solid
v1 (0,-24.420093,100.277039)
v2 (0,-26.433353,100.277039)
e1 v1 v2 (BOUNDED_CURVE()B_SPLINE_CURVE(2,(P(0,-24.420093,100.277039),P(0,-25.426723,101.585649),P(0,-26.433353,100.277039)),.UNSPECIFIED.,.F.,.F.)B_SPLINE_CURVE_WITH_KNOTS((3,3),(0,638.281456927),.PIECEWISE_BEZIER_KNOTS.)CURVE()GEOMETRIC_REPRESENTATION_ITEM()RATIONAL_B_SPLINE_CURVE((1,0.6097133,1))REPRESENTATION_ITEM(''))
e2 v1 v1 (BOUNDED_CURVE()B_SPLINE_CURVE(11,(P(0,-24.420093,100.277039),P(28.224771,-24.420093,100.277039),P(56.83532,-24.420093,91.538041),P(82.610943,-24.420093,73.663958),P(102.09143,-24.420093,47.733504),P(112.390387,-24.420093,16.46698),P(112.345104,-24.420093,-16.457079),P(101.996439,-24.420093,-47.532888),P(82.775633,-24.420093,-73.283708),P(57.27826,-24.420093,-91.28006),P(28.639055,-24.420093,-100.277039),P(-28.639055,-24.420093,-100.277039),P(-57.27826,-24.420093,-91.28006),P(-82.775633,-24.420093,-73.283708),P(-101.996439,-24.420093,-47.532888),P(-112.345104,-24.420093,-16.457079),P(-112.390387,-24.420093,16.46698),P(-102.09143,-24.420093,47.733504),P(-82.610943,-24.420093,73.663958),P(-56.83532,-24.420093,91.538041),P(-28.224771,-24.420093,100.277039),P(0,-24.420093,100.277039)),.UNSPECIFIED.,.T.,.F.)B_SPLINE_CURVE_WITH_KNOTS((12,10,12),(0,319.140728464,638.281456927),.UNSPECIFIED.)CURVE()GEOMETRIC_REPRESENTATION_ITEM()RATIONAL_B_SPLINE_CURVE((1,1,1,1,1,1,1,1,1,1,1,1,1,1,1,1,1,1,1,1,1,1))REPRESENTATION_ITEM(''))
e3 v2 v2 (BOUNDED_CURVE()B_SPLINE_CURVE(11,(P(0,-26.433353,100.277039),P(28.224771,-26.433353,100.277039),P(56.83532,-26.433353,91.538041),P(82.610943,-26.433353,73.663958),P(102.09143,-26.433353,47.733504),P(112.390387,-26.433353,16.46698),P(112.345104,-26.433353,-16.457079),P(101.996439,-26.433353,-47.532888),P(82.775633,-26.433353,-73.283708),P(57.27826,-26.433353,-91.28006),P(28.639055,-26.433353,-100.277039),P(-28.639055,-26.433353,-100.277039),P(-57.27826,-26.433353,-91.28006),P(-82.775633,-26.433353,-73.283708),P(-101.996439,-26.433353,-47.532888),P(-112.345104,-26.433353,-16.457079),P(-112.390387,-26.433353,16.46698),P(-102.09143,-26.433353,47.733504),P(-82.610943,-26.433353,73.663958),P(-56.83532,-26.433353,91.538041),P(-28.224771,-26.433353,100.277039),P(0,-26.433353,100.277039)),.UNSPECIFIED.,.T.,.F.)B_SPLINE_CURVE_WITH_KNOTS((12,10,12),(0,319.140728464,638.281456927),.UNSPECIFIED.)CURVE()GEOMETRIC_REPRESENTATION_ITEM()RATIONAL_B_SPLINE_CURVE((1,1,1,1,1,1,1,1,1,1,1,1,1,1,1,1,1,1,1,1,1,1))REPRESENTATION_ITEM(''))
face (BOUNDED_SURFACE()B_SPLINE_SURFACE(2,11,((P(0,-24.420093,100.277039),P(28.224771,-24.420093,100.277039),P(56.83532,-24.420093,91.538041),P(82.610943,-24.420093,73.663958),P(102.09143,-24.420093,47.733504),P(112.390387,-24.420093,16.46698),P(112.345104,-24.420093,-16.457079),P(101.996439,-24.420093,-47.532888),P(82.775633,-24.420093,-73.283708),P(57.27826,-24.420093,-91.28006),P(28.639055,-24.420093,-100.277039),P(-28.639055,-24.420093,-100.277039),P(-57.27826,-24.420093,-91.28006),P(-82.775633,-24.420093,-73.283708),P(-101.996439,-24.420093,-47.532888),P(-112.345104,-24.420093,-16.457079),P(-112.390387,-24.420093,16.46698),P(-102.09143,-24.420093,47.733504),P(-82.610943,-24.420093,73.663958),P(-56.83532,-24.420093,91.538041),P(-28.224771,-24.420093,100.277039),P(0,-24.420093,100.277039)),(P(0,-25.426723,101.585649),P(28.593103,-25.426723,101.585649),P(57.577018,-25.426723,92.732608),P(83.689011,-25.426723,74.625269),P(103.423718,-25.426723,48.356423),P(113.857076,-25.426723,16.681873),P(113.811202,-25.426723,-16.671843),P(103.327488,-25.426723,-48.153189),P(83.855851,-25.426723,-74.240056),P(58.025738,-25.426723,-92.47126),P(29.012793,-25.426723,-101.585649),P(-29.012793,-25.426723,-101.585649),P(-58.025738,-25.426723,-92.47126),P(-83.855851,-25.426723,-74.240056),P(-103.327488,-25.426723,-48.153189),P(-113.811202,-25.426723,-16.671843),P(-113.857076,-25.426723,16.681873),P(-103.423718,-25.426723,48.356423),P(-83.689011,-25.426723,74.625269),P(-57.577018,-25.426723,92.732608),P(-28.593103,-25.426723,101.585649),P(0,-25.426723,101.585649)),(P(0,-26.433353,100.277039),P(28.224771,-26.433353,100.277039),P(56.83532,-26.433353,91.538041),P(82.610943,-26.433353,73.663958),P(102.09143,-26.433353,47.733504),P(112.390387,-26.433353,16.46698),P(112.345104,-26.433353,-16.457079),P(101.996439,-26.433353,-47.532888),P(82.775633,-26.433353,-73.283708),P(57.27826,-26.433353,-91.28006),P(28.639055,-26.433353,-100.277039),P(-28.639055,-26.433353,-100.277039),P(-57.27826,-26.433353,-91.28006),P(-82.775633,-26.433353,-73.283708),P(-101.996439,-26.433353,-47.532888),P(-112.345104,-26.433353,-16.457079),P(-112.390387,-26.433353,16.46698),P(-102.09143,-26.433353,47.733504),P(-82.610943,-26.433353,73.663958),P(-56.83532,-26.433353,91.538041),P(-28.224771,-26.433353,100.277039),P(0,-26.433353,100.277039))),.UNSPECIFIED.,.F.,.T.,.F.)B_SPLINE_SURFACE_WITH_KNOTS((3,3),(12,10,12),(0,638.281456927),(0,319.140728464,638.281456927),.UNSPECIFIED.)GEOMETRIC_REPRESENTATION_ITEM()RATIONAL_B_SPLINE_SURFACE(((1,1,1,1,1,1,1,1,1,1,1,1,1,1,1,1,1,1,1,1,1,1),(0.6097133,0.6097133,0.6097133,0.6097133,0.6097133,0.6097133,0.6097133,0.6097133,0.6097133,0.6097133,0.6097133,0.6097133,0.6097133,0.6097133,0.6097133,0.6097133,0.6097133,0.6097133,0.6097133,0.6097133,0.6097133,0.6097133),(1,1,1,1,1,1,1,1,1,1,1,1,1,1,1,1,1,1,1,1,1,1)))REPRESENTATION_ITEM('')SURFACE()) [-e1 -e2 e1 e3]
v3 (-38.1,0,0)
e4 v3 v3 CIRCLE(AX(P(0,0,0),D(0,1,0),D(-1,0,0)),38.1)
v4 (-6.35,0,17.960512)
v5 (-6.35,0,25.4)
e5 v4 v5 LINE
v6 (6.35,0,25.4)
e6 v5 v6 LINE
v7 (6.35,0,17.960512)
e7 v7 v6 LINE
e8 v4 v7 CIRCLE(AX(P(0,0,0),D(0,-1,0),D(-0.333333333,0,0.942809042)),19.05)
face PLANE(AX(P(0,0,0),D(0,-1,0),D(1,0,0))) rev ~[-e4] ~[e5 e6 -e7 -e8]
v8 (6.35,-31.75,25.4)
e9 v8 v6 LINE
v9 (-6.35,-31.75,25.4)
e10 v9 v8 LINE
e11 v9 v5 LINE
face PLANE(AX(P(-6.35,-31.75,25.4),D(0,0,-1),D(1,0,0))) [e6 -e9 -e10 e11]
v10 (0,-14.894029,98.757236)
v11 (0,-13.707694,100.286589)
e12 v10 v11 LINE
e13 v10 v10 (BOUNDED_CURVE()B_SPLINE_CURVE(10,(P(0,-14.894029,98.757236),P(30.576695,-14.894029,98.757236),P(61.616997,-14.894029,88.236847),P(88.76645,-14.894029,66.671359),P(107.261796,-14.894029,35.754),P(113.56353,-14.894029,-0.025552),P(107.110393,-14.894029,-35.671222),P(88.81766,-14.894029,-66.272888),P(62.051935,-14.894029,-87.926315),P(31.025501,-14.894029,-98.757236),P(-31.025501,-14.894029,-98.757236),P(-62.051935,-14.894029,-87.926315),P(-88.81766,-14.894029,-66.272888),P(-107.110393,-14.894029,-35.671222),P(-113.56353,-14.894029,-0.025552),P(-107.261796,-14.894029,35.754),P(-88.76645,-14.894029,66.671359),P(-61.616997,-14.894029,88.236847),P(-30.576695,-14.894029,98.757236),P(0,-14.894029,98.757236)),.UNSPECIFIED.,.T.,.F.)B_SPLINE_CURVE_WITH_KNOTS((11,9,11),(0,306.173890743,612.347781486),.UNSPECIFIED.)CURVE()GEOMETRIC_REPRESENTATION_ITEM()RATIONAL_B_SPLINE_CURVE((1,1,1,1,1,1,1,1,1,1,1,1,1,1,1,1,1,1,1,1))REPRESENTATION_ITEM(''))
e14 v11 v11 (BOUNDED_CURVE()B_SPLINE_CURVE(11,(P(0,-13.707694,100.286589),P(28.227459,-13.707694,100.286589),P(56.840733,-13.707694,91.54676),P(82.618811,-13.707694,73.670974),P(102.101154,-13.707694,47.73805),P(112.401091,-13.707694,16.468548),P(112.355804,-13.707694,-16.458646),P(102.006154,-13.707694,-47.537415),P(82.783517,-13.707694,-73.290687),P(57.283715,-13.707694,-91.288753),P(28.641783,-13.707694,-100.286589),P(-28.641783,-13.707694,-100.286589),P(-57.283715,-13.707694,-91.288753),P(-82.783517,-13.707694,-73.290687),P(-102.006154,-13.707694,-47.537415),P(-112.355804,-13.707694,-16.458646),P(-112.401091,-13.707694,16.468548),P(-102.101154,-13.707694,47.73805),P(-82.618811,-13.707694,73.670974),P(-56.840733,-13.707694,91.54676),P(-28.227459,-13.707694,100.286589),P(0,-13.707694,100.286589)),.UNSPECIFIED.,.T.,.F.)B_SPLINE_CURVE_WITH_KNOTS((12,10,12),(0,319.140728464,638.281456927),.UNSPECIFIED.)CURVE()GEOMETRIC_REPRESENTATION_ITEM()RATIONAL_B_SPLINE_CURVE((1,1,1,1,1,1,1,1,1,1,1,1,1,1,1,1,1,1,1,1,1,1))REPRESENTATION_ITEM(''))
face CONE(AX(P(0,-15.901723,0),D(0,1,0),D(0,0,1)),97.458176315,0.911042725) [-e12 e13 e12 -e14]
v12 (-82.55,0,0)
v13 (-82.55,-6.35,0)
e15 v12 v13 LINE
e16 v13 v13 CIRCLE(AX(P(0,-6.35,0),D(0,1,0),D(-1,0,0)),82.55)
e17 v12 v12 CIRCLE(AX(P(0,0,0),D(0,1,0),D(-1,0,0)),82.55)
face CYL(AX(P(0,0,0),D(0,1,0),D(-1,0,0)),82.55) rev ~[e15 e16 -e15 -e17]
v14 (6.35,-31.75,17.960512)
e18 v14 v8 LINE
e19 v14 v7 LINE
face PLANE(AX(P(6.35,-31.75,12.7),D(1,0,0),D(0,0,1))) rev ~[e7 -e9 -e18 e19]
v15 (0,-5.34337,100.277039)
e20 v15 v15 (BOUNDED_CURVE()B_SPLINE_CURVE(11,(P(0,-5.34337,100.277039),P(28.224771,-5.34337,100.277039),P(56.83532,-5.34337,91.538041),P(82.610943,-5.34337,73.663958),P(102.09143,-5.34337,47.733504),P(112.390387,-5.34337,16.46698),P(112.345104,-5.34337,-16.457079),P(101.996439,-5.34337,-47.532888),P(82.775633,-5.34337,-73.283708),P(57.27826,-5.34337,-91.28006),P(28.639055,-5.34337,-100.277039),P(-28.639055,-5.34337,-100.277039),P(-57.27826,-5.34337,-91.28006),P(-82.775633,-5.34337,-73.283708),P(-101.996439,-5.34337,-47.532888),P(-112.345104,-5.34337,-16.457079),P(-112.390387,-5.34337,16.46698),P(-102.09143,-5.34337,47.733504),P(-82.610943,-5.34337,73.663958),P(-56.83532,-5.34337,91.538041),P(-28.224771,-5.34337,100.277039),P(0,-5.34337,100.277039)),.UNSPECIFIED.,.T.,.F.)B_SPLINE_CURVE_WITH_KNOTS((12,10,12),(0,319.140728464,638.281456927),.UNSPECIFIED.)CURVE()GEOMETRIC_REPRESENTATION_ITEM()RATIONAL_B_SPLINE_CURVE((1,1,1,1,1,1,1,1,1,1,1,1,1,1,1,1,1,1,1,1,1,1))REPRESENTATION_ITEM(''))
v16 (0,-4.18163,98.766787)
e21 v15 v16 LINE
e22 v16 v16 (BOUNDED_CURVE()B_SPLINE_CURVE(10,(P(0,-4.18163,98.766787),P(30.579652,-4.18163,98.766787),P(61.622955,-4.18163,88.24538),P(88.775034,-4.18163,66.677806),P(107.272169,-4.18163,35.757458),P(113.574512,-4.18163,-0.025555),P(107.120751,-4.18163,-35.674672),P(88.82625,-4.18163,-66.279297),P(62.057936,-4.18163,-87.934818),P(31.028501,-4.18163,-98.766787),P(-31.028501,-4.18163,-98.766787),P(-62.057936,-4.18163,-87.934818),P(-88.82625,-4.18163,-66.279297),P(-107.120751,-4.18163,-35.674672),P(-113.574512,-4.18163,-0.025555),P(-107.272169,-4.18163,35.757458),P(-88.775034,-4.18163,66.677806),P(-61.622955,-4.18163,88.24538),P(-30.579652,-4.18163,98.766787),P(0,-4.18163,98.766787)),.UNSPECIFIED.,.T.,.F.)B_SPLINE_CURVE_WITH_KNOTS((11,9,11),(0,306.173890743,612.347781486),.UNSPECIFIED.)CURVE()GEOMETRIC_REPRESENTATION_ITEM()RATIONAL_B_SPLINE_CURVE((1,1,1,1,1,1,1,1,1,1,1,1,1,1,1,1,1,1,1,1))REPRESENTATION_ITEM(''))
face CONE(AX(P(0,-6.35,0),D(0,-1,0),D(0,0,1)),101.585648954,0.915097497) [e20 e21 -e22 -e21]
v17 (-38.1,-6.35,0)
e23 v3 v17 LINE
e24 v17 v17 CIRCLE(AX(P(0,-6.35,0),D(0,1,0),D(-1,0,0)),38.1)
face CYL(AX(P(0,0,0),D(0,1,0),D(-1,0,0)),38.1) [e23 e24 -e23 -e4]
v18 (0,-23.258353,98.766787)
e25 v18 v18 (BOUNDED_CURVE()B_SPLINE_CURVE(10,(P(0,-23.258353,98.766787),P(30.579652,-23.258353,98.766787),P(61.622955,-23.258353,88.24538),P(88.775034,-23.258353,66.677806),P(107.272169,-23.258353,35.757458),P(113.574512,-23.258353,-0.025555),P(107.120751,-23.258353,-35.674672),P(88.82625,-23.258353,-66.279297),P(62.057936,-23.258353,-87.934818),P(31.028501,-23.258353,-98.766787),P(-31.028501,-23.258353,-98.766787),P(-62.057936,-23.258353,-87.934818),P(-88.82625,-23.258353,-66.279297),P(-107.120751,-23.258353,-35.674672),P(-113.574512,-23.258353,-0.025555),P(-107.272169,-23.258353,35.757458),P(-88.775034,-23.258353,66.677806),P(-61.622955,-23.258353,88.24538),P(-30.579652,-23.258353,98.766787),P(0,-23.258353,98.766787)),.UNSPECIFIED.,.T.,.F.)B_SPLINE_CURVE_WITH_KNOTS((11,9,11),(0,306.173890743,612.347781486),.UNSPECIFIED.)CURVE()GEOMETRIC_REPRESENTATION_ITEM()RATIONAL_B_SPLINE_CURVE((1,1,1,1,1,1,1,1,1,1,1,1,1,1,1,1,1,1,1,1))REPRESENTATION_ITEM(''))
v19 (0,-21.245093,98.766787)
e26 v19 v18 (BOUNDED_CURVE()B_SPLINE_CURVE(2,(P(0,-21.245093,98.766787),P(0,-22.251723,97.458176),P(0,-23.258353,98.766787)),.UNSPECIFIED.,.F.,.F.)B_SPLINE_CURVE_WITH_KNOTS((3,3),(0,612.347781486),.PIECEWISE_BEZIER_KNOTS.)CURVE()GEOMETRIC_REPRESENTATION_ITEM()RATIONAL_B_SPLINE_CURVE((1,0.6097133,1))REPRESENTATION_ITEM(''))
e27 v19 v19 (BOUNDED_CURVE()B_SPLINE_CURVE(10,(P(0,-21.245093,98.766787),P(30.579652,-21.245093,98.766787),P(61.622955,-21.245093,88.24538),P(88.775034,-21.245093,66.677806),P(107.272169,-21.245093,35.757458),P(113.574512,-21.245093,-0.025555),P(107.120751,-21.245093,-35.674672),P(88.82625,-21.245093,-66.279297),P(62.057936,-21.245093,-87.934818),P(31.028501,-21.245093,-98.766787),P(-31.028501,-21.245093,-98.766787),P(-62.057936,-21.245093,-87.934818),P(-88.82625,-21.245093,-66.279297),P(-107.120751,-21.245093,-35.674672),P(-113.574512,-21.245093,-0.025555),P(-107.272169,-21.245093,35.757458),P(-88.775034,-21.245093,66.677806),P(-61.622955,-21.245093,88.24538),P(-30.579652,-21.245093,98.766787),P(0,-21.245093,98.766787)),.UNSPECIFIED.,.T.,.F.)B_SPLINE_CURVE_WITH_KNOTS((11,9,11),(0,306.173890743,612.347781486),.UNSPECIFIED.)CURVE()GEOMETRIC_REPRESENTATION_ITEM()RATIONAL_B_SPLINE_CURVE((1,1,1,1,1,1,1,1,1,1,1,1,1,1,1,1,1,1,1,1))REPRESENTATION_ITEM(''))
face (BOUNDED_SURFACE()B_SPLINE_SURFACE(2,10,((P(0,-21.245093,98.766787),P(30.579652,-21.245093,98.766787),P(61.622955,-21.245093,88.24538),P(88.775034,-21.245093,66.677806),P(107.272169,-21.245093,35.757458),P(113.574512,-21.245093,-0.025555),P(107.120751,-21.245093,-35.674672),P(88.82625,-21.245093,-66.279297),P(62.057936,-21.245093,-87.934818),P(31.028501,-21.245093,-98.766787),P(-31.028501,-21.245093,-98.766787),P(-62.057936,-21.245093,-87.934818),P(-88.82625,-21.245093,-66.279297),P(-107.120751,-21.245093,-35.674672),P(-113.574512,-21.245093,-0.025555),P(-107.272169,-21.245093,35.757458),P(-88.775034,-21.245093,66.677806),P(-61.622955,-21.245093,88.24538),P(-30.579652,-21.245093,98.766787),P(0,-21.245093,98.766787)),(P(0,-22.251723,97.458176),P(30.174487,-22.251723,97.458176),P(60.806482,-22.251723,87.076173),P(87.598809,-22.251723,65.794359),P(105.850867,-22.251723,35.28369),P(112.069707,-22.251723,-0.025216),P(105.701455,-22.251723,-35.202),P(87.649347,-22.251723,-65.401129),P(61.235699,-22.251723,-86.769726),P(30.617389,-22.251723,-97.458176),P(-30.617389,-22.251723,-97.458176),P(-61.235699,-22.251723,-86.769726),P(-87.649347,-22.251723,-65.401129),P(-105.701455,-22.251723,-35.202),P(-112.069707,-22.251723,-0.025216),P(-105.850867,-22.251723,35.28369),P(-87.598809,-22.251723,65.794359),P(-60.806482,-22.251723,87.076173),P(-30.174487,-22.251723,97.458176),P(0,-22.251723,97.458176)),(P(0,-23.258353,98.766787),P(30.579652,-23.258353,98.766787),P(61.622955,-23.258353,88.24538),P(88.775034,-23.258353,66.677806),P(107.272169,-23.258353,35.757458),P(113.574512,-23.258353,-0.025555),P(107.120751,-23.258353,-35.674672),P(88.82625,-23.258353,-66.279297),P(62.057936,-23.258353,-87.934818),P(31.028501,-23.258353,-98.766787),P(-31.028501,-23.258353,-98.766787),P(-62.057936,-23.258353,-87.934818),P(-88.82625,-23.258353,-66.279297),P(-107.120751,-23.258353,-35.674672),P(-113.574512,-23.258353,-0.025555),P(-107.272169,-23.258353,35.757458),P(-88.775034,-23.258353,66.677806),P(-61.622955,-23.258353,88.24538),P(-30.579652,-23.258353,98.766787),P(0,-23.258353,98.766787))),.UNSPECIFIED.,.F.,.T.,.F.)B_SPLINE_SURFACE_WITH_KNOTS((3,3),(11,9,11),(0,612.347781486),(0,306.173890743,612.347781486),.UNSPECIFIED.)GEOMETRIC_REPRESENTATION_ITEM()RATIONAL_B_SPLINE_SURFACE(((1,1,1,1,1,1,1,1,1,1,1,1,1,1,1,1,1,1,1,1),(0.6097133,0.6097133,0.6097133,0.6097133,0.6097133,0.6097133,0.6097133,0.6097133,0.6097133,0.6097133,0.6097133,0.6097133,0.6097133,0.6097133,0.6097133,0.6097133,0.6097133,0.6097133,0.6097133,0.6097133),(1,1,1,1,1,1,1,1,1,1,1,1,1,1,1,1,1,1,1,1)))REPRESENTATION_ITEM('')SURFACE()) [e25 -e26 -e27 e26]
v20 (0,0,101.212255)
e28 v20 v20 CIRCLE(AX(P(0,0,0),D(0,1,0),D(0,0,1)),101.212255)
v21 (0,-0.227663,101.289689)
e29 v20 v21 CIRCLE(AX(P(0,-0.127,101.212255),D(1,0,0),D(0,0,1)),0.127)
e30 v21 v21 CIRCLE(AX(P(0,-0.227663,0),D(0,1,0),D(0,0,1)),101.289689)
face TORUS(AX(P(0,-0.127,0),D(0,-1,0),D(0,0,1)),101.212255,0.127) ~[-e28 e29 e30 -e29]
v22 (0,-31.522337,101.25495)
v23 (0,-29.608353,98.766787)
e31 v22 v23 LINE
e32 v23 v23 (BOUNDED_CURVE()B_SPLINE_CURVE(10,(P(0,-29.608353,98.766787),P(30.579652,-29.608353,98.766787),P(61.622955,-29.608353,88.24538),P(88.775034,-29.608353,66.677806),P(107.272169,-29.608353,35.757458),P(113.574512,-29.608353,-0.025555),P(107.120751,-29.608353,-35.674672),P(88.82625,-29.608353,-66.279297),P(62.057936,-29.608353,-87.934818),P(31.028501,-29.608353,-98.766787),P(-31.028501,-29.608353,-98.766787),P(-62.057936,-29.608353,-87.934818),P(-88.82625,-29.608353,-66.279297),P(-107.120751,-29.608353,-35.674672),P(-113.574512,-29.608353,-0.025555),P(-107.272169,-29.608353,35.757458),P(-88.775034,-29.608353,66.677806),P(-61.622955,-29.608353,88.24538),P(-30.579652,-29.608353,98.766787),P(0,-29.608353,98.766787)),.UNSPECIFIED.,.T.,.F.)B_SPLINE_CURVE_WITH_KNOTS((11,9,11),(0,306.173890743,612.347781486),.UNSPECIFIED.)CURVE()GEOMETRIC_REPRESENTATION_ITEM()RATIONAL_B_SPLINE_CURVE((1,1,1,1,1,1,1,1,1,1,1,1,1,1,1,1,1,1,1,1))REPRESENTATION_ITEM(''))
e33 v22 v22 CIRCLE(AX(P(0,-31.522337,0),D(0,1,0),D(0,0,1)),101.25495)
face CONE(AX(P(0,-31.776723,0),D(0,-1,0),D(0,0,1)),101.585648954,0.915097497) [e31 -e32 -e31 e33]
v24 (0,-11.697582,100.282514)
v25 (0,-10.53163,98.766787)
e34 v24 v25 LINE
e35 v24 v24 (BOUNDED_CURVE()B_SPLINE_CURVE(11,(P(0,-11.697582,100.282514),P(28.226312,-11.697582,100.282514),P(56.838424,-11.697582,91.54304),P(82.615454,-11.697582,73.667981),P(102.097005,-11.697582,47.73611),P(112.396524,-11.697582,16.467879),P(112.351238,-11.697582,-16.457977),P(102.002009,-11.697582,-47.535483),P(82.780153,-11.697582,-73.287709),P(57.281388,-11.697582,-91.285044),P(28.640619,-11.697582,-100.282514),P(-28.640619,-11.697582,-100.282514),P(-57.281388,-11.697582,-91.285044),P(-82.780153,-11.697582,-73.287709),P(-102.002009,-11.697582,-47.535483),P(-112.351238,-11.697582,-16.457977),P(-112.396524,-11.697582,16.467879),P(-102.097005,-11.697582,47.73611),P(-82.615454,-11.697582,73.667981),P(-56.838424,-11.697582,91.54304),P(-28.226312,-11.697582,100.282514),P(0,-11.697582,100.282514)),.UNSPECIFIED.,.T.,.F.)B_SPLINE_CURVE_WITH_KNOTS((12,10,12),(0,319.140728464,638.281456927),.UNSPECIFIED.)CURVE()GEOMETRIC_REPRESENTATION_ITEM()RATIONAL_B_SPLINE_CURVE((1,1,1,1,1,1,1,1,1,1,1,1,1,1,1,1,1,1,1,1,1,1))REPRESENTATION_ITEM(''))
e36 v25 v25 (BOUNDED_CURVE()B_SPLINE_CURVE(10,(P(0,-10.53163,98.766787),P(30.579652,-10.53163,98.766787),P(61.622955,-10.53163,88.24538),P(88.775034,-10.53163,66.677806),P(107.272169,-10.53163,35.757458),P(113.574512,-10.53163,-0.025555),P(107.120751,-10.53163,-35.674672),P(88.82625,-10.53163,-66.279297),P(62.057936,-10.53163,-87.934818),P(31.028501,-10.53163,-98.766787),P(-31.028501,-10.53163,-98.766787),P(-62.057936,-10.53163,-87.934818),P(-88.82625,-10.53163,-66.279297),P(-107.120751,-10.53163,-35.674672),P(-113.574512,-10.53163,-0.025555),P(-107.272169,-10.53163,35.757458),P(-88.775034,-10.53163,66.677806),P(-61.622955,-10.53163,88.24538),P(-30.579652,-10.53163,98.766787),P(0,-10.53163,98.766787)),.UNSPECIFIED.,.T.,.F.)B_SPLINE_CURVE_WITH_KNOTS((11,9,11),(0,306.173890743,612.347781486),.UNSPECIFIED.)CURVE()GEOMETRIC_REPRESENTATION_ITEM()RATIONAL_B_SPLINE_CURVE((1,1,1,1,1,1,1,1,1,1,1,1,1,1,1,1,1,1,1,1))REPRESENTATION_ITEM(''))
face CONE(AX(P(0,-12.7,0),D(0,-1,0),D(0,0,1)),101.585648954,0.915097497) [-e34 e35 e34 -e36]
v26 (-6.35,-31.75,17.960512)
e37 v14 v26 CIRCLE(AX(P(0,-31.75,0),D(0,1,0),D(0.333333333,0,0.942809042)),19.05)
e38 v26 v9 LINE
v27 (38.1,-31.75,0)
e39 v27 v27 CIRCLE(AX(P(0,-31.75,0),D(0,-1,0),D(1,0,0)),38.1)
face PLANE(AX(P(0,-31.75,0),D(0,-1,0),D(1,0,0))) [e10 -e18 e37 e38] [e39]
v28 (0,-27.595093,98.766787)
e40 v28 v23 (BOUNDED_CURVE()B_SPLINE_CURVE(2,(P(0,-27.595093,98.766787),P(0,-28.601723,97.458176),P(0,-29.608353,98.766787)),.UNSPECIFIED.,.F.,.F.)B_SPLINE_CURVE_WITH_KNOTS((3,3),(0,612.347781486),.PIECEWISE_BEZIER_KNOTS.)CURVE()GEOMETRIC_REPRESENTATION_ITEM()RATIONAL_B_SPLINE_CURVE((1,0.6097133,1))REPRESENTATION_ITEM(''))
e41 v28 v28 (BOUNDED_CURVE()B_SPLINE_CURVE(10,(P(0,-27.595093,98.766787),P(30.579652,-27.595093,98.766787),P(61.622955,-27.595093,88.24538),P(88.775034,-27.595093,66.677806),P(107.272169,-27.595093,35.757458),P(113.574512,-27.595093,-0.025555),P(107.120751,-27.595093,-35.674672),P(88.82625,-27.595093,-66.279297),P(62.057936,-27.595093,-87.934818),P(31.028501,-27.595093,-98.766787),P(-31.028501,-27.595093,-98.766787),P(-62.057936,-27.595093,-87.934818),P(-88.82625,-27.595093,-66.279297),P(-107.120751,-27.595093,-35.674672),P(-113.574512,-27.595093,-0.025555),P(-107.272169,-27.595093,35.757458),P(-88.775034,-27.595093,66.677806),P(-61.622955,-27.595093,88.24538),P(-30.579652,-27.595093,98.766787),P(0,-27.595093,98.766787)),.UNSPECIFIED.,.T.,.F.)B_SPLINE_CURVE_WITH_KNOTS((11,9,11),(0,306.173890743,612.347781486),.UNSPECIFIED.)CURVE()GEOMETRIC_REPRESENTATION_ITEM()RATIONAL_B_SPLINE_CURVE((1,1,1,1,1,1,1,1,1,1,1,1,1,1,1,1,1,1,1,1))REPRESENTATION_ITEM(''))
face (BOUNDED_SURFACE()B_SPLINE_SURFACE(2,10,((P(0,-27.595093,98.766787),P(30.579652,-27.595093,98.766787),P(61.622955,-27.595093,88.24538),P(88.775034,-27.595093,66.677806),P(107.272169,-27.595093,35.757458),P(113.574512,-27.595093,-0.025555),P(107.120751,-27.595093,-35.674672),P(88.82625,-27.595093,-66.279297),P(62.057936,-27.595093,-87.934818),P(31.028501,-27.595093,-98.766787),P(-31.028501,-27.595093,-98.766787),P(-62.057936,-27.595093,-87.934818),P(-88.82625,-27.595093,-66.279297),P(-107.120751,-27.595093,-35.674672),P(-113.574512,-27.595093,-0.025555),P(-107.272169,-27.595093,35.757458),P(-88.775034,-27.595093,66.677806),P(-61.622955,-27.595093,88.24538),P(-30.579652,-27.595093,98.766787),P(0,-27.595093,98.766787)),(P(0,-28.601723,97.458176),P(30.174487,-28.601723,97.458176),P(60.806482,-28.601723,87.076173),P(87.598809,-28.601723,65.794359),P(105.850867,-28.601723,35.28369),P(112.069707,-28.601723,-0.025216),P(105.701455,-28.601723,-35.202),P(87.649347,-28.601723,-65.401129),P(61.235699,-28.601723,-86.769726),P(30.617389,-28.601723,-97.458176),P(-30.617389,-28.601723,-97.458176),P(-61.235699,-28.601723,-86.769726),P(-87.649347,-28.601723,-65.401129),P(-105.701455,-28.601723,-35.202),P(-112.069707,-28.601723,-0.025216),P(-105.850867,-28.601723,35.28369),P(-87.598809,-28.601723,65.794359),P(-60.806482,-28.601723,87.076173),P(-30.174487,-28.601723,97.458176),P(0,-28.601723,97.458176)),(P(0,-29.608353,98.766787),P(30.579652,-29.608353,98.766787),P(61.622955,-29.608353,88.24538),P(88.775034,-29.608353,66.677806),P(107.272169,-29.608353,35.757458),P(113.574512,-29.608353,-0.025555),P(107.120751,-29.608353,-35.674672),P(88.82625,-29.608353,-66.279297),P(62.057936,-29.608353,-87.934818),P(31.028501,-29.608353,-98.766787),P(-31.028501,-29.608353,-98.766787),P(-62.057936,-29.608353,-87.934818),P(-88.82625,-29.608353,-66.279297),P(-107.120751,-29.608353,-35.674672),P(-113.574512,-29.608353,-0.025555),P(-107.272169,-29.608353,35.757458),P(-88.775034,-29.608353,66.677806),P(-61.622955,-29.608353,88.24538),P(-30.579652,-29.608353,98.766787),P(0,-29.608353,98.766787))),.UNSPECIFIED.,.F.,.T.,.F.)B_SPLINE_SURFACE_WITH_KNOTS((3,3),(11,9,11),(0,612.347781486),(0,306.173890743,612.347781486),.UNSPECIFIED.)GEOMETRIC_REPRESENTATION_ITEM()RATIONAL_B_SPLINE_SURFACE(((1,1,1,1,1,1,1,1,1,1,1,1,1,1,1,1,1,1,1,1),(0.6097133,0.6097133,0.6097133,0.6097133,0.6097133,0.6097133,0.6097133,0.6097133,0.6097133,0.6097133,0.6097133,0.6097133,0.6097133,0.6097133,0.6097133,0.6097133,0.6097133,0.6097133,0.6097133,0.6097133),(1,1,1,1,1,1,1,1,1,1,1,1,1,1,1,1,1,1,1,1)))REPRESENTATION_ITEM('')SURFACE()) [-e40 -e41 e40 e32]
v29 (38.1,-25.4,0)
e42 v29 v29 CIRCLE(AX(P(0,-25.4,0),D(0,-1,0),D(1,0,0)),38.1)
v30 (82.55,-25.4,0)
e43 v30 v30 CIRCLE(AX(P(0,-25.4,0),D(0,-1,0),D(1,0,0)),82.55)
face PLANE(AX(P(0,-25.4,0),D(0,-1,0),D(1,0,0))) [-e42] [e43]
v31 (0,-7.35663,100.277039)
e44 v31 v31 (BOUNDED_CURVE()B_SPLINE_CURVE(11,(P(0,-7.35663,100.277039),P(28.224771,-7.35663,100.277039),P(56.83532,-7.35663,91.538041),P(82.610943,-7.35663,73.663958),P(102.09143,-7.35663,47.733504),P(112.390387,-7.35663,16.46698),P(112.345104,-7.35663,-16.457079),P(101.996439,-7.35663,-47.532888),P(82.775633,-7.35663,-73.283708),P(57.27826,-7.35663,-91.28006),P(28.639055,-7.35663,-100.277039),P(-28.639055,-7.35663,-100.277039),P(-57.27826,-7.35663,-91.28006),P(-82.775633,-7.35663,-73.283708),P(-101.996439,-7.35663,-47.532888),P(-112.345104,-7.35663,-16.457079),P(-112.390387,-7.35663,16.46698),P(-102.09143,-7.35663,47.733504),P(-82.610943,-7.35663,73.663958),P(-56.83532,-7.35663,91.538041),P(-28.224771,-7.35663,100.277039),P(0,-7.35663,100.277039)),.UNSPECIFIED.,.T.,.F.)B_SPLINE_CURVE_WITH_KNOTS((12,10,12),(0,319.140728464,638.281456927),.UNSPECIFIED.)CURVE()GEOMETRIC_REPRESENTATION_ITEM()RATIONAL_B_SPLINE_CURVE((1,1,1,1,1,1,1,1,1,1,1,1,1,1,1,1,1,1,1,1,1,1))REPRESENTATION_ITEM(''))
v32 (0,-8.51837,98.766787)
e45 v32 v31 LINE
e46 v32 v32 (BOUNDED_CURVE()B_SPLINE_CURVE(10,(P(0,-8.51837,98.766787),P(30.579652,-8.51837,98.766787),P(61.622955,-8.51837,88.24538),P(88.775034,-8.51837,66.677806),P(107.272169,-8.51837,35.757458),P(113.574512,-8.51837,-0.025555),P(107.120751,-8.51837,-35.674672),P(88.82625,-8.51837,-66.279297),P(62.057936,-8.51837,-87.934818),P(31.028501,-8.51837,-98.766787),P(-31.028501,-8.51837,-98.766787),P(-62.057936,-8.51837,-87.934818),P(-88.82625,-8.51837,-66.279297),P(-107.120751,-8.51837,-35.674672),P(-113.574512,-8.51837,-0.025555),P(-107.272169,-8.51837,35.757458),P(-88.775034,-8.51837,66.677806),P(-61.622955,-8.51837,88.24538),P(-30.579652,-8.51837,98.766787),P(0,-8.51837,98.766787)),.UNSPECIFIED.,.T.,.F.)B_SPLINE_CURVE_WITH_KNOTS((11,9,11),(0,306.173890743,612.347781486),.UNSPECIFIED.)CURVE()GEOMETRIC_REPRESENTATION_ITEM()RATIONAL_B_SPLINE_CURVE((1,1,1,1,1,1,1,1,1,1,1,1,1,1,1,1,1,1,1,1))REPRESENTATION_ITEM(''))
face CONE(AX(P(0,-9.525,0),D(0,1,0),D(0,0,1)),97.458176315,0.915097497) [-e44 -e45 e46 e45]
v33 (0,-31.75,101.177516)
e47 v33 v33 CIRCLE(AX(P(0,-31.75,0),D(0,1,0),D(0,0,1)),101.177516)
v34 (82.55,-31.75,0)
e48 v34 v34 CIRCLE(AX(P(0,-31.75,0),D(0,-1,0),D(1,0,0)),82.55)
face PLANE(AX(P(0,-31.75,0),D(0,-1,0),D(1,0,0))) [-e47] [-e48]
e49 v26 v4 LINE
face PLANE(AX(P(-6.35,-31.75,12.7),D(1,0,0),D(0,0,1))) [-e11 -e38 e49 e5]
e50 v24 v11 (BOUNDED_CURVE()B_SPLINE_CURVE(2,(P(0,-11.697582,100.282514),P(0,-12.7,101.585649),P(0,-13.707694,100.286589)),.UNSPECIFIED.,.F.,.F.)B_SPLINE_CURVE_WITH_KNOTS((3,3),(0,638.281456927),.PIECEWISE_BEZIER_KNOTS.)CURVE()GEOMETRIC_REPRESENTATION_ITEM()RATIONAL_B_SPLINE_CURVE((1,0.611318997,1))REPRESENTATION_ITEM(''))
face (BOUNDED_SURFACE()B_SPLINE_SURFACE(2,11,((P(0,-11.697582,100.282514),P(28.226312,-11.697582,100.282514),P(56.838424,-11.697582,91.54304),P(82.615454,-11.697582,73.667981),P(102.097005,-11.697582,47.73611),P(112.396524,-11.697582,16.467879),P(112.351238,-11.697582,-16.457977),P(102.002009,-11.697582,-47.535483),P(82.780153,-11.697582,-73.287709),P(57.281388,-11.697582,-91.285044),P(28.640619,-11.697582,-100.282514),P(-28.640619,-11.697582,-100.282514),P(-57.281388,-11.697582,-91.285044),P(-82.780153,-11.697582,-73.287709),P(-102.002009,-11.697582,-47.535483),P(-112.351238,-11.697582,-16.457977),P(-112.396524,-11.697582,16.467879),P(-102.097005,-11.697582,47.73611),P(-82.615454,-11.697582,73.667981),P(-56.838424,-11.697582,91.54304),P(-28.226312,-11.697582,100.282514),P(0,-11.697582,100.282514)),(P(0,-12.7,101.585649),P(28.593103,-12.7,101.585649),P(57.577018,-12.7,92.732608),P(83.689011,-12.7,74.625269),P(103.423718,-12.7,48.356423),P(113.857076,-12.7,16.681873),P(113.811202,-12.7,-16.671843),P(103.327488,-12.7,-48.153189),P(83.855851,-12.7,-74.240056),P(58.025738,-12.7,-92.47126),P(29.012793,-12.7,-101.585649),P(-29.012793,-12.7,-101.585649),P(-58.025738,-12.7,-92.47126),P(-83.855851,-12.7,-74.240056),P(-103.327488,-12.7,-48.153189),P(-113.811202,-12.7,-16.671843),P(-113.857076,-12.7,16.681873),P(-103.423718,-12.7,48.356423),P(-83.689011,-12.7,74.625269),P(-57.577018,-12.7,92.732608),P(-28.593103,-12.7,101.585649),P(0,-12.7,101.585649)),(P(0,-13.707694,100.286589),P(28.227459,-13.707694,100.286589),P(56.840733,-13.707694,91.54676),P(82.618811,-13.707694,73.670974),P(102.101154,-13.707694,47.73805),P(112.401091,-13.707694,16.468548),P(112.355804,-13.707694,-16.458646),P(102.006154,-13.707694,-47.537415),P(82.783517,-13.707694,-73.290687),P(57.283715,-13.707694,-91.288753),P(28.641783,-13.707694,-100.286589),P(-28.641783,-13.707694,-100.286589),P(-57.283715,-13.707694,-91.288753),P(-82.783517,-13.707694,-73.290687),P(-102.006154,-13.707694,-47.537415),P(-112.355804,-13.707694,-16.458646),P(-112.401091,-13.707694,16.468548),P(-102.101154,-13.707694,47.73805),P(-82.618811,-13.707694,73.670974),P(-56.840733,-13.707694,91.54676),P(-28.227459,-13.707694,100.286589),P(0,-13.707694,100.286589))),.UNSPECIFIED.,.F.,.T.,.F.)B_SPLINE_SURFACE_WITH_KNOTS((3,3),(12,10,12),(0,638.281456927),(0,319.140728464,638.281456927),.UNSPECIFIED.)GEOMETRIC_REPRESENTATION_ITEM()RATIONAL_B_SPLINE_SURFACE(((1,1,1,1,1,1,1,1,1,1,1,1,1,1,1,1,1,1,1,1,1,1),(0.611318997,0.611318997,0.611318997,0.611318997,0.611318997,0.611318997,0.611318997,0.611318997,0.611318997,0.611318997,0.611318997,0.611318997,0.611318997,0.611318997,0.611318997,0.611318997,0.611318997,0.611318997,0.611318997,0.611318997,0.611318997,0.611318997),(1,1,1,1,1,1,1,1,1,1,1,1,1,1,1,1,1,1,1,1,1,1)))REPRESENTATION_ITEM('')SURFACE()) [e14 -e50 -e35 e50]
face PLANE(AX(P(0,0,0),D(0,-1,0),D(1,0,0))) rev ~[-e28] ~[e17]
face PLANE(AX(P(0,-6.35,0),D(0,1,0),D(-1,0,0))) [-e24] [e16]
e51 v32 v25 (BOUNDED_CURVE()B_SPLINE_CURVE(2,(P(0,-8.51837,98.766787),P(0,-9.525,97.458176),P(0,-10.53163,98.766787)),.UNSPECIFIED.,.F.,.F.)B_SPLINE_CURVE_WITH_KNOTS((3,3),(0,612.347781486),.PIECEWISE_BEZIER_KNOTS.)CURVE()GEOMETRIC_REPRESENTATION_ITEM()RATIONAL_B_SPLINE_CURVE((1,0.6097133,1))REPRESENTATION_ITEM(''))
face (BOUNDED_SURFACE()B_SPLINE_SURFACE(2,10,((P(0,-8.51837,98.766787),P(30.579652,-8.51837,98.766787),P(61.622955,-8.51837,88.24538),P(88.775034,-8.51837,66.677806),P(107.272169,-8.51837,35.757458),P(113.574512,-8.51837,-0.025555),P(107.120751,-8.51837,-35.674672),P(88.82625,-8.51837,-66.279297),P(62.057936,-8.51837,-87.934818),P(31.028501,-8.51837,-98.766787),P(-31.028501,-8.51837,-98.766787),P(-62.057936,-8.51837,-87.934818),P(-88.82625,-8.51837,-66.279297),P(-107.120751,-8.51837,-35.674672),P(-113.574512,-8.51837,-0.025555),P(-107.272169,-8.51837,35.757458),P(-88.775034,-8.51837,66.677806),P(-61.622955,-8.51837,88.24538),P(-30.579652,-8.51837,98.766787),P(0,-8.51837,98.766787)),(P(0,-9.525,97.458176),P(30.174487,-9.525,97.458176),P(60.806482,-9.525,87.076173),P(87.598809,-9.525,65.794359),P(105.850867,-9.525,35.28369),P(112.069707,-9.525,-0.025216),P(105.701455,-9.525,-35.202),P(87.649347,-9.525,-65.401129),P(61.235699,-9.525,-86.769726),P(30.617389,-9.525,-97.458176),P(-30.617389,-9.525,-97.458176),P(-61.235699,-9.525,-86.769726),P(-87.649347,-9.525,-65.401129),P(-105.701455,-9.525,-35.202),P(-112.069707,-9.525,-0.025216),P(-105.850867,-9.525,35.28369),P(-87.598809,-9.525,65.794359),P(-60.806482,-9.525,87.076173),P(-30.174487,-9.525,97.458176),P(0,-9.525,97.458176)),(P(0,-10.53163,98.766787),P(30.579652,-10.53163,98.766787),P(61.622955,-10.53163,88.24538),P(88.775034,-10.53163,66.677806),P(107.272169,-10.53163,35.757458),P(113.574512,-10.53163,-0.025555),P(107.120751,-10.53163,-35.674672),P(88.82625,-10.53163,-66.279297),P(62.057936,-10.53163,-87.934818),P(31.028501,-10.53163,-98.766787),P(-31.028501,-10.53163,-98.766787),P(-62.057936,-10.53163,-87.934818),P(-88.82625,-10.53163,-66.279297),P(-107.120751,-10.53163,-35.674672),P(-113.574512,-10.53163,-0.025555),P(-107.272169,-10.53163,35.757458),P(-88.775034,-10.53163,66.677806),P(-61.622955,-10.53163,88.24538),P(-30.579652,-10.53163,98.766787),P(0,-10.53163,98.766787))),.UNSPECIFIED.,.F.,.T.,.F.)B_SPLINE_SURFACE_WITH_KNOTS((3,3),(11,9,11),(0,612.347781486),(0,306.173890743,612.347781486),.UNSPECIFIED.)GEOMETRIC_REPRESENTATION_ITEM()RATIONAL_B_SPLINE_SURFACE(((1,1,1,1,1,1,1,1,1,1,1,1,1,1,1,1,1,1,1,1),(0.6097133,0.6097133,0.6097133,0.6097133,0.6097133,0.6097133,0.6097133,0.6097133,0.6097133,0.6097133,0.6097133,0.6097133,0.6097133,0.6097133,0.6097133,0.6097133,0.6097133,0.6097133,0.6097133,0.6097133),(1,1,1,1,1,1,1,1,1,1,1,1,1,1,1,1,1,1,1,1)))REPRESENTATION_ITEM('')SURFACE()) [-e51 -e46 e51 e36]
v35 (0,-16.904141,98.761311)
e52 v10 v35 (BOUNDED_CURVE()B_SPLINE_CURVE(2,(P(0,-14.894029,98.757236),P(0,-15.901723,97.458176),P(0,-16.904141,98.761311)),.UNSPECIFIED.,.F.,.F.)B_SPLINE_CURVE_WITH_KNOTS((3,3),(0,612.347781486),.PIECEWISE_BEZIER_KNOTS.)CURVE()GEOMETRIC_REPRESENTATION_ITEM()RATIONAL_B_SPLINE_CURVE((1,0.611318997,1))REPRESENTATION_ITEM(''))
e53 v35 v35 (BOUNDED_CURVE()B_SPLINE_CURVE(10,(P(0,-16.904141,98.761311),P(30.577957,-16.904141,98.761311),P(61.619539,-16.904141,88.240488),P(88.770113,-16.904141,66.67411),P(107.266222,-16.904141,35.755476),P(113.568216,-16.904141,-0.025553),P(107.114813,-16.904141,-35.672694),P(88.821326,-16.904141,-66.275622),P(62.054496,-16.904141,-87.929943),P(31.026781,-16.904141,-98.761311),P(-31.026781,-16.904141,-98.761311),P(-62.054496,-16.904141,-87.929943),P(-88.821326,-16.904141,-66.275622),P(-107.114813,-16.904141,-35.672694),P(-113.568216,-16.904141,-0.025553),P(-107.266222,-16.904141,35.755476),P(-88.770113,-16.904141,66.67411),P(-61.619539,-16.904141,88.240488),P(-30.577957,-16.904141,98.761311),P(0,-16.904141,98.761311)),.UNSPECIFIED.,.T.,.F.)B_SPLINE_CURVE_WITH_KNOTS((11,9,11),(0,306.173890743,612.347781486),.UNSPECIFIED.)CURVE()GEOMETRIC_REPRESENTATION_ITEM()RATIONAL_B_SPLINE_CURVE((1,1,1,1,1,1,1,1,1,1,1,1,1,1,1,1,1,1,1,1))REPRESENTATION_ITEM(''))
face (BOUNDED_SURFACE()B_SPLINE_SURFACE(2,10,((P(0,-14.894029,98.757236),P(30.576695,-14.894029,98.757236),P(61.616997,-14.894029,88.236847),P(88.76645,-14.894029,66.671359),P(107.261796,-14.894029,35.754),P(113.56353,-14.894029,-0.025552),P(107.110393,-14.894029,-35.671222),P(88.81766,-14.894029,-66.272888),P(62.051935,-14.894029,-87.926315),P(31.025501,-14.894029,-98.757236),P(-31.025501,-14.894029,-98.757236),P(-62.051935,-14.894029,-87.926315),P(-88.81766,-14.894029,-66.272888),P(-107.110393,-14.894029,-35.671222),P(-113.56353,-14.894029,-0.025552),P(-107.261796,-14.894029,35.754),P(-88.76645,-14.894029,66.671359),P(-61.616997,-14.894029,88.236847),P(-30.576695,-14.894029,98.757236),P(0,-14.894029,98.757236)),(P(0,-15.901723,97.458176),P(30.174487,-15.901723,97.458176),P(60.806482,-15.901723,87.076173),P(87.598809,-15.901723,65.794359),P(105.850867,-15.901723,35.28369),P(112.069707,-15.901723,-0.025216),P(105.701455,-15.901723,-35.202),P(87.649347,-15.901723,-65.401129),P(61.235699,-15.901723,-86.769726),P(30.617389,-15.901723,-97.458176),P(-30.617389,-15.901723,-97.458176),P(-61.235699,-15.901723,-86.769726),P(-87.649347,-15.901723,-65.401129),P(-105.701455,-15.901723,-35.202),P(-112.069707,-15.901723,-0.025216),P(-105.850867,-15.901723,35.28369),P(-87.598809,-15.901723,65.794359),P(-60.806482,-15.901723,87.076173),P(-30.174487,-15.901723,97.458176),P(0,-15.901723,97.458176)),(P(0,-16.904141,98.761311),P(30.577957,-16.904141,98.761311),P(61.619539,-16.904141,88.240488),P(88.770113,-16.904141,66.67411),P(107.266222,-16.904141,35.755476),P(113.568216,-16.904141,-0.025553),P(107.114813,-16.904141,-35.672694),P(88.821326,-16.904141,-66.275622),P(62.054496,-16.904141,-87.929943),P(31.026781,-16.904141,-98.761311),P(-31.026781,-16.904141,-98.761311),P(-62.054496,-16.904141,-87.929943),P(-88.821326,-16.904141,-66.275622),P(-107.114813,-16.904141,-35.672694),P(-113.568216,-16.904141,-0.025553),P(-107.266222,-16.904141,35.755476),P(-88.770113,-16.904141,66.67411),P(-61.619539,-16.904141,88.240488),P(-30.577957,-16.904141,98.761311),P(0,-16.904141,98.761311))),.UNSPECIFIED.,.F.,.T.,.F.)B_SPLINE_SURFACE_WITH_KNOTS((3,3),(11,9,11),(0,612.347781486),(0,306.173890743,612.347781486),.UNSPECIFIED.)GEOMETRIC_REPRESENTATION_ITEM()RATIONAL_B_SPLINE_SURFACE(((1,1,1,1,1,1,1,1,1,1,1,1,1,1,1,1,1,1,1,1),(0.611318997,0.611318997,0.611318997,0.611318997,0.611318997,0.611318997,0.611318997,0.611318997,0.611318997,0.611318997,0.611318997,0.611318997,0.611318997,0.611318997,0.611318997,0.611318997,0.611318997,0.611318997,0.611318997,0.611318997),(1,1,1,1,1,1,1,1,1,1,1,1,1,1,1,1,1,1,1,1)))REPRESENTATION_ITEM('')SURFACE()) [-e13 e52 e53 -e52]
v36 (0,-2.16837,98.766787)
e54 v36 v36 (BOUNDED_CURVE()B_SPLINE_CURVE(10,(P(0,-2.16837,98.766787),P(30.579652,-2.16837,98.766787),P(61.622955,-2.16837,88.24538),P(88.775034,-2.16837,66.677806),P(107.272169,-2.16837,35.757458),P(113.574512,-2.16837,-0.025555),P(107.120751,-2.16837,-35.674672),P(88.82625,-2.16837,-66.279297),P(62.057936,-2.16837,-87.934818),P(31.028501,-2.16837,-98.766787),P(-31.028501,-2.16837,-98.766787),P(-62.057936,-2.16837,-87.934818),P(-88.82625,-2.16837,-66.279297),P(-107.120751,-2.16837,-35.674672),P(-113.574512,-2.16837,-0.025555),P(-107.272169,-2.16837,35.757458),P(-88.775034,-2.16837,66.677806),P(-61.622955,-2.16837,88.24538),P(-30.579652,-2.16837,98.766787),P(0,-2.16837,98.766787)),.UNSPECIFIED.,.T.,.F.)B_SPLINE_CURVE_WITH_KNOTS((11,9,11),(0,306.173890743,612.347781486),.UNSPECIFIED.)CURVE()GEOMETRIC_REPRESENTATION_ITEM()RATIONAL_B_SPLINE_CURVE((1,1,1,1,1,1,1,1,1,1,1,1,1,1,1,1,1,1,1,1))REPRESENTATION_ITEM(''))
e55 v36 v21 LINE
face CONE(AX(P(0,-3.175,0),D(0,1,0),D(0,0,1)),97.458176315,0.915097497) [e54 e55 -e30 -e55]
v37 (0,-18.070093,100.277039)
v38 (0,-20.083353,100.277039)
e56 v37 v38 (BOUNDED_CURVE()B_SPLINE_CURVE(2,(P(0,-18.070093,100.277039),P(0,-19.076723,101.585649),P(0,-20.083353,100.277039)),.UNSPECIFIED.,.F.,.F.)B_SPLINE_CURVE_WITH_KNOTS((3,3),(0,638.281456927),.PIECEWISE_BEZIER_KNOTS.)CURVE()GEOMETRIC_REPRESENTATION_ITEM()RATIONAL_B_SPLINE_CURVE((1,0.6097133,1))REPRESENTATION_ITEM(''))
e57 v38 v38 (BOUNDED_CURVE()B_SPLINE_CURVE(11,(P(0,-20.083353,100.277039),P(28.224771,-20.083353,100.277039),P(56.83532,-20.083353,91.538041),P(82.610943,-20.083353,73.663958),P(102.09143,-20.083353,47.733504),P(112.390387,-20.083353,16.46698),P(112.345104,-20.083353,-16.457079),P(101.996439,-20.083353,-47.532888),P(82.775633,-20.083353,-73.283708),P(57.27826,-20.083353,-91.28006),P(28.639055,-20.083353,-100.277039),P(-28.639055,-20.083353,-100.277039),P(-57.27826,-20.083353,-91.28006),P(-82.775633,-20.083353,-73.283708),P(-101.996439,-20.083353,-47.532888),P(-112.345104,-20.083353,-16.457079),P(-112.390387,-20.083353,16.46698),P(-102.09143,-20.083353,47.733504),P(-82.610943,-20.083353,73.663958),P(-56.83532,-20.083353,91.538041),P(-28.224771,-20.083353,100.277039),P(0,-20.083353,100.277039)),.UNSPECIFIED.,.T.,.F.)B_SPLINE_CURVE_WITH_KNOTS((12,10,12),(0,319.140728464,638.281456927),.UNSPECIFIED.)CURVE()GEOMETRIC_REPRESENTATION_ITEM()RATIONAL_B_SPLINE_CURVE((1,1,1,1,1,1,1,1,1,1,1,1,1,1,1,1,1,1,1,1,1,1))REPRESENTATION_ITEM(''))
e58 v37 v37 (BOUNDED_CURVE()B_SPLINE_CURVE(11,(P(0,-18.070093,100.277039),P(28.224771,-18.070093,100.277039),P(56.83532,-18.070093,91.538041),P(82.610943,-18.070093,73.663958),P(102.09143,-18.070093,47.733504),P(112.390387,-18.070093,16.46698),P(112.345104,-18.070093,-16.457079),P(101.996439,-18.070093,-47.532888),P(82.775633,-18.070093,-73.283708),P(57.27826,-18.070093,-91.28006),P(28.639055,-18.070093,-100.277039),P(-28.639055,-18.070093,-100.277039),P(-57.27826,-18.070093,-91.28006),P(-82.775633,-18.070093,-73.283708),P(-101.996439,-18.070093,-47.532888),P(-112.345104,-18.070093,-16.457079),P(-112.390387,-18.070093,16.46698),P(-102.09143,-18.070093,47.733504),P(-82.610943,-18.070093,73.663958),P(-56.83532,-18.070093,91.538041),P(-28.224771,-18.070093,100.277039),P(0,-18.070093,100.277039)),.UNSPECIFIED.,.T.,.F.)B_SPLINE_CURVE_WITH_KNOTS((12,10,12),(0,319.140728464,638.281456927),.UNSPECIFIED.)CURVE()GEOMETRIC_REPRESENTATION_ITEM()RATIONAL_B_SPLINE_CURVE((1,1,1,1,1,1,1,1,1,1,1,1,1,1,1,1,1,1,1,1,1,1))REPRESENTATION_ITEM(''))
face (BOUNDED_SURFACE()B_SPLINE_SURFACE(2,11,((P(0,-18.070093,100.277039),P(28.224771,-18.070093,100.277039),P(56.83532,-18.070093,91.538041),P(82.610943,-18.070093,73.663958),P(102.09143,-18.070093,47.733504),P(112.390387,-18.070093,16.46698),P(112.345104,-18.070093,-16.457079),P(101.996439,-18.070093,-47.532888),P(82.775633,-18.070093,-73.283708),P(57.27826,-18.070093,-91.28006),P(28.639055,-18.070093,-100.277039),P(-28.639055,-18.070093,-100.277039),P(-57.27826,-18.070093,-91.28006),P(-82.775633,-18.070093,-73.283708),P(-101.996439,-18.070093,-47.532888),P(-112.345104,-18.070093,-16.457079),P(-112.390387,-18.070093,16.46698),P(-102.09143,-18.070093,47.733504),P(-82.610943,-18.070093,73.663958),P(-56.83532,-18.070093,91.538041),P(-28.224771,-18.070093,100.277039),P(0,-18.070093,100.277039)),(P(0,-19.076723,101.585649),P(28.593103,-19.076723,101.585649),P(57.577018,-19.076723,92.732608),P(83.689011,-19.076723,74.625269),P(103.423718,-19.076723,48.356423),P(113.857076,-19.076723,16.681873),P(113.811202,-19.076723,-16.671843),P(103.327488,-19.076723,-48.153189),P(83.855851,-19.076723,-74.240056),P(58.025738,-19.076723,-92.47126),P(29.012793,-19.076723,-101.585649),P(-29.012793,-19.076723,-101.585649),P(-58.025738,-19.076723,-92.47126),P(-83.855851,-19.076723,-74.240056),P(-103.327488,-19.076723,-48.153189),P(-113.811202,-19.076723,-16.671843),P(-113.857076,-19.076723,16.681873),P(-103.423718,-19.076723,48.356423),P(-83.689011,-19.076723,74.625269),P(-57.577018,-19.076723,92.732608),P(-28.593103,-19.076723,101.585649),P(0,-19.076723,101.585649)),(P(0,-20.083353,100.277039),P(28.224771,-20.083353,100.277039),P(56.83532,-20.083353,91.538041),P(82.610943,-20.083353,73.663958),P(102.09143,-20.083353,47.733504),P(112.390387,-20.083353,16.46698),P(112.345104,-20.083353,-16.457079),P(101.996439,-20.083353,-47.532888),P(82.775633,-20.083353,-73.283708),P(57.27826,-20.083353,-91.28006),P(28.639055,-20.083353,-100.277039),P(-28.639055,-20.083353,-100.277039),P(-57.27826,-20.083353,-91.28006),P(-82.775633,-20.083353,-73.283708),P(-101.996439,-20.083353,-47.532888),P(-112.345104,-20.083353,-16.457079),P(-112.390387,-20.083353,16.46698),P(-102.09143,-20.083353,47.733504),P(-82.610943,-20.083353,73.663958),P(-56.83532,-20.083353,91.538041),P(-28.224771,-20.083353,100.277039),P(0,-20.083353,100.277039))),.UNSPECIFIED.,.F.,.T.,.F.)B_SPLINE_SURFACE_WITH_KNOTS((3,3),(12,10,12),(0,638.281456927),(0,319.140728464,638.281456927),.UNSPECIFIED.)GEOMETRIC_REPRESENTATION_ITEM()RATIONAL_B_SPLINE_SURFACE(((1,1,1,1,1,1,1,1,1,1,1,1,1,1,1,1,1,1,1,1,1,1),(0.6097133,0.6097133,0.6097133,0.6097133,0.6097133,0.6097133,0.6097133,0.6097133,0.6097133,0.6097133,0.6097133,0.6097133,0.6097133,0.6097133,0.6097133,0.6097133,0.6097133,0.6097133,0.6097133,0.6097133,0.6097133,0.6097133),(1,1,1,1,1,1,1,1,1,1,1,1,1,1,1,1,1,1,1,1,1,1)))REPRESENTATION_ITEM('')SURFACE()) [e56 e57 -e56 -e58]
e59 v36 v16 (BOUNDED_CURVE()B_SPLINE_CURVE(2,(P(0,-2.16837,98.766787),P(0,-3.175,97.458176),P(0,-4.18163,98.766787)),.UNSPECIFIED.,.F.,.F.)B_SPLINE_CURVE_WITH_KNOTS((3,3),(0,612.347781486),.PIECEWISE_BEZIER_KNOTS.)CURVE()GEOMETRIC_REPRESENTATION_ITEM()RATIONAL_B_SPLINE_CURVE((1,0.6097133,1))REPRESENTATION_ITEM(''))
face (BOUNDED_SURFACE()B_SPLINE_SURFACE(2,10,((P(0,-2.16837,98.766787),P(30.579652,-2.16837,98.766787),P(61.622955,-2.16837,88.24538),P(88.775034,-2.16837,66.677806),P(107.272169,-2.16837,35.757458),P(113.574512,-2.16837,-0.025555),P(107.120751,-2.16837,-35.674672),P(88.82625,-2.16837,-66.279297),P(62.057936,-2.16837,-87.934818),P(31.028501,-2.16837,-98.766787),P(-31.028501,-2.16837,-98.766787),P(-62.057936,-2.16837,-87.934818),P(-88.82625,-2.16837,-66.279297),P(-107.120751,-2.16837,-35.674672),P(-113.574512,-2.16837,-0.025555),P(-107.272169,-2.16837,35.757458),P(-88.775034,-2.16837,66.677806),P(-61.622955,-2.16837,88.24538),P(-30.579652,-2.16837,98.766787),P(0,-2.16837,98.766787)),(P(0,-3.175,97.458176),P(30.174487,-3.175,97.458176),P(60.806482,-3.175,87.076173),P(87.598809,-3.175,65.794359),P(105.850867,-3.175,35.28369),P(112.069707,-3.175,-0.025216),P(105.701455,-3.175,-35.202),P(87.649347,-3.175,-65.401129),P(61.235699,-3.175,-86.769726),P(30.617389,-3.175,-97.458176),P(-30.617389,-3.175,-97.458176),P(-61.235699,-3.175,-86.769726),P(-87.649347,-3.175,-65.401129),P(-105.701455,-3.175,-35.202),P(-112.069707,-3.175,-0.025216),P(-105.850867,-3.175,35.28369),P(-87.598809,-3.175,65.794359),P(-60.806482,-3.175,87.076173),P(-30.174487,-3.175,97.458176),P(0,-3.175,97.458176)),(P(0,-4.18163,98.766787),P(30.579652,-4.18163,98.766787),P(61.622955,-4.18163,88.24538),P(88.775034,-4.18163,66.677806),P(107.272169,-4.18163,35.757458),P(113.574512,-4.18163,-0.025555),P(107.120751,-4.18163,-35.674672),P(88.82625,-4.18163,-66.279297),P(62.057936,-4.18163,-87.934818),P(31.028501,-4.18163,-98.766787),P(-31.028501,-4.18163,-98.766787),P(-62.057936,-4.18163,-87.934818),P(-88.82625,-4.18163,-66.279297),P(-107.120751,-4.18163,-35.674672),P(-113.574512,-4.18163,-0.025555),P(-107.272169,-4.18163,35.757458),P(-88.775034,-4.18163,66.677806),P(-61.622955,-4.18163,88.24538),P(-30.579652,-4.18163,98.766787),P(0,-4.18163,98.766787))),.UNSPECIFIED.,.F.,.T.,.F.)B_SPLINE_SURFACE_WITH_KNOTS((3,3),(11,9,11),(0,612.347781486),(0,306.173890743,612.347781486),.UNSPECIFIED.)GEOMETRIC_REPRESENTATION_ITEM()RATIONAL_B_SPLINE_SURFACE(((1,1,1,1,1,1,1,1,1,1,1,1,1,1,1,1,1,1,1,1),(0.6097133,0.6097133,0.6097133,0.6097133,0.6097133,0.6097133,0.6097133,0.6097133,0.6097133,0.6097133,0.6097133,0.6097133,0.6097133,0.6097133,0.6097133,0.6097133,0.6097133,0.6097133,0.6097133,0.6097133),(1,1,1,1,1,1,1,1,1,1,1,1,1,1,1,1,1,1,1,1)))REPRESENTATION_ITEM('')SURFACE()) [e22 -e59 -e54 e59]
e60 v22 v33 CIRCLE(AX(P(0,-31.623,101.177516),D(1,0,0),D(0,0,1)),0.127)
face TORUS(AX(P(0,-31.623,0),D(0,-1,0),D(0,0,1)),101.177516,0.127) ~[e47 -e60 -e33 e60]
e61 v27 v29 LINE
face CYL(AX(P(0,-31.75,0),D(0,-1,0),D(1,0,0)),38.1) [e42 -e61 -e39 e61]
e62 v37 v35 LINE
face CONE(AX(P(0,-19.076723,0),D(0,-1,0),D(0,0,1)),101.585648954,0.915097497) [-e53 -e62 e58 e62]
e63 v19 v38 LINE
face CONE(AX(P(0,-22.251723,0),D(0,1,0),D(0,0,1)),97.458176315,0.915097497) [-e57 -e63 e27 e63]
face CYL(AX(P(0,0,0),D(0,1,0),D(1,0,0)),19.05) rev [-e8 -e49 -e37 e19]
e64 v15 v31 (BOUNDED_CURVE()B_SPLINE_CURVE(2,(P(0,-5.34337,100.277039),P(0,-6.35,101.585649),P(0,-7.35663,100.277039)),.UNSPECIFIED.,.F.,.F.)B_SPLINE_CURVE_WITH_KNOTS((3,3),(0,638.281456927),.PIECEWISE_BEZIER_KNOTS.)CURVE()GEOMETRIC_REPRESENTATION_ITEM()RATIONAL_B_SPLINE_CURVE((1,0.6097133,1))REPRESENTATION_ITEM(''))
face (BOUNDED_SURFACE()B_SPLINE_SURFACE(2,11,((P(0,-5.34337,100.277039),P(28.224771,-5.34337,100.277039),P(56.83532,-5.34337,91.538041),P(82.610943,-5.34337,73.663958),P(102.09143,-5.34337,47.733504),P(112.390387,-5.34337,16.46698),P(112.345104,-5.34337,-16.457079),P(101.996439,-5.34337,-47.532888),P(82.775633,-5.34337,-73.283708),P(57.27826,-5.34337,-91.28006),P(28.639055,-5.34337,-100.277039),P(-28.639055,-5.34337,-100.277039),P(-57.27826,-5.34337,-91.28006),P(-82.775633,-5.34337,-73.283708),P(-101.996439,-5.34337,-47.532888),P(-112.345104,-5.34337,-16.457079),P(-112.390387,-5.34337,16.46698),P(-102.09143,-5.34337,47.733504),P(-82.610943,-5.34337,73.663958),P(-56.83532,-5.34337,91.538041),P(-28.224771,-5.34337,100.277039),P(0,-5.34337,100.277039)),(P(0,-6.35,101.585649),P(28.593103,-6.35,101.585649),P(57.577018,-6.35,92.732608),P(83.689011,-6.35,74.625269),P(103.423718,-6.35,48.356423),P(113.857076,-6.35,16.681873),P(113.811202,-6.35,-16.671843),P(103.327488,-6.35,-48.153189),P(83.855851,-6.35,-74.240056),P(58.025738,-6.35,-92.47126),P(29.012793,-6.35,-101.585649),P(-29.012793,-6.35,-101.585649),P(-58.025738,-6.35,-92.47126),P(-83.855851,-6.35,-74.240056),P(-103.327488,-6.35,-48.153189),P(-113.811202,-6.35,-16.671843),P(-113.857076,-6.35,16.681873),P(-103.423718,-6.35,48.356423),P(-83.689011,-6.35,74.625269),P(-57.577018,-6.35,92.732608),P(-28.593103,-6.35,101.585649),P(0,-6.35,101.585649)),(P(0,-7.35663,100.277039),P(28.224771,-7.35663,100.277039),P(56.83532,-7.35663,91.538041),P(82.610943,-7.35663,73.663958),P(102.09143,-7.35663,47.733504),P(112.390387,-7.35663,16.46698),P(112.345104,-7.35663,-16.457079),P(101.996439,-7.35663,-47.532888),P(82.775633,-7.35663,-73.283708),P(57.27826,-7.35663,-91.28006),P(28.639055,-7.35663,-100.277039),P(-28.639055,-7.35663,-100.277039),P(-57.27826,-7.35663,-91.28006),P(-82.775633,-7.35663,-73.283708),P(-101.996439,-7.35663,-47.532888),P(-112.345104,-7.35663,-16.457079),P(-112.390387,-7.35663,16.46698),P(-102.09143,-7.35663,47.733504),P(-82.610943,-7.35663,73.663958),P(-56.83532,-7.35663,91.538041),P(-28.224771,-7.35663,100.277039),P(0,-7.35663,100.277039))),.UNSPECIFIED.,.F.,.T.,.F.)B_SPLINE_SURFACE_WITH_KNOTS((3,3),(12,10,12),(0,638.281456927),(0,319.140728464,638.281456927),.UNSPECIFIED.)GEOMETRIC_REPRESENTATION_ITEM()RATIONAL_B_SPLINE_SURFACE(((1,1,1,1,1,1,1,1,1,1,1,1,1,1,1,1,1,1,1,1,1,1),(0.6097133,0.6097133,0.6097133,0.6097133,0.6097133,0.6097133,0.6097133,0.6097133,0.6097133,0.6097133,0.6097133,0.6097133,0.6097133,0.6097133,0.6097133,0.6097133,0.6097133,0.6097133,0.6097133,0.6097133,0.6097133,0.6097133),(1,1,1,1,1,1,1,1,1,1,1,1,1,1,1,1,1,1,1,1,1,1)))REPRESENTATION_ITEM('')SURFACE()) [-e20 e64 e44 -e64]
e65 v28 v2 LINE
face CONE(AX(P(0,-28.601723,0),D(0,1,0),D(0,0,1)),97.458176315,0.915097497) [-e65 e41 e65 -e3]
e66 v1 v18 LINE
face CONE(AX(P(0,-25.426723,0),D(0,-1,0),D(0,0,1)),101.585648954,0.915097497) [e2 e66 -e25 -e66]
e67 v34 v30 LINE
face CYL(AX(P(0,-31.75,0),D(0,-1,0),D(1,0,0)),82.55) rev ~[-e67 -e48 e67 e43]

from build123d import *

# Parameters (mm, degrees)
F0_R     = 101.6
F0_R_2   = 19.05
F1_DEPTH = 31.75
F2_R     = 82.55
F2_R_2   = 38.1
F3_DEPTH = 6.35
F4_R     = 82.55
F4_R_2   = 38.1
F5_DEPTH = 6.35
F6_W     = 12.7
F6_H     = 12.7
F7_DEPTH = 31.751
F10_R    = 0.127
F11_R    = 1.27


with BuildPart() as f1:
    # F0 (on Front) → F1 (new body)
    with BuildSketch(Plane.XZ):
        Circle(F0_R)
        Circle(F0_R_2, mode=Mode.SUBTRACT)
    extrude(amount=F1_DEPTH)

    # F2 (on face) → F3 (cut)
    with BuildSketch(Plane.XZ.offset(31.75)):
        Circle(F2_R)
        Circle(F2_R_2, mode=Mode.SUBTRACT)
    extrude(amount=-F3_DEPTH, mode=Mode.SUBTRACT)

    # F4 (on face) → F5 (cut)
    with BuildSketch(Plane(origin=(0, 0, 0), x_dir=(-1, 0, 0), z_dir=(0, 1, 0))):
        Circle(F4_R)
        Circle(F4_R_2, mode=Mode.SUBTRACT)
    extrude(amount=-F5_DEPTH, mode=Mode.SUBTRACT)

    # F6 (on face) → F7 (cut, through all)
    with BuildSketch(Plane.XZ.offset(31.75)):
        with Locations((0, 19.05)):
            Rectangle(F6_W, F6_H)
    extrude(amount=-F7_DEPTH, mode=Mode.SUBTRACT)

    # F8 (on Right) → F9 (revolve, cut)
    with BuildSketch(Plane.YZ):
        Polygon((-3.175, 97.4581763148), (0, 101.5856489539), (0, 113.58909374), (-31.7767225206, 113.58909374), (-31.7767225206, 101.5856489539), (-28.6017225206, 97.4581763148), (-25.4267225206, 101.5856489539), (-22.2517225206, 97.4581763148), (-19.0767225206, 101.5856489539), (-15.9017225206, 97.4581763148), (-12.7, 101.5856489539), (-9.525, 97.4581763148), (-6.35, 101.5856489539), align=None)
    revolve(axis=Axis((0, 0, 0), (0, 1, 0)), mode=Mode.SUBTRACT)

    # F10
    f10_edges = [f1.edges().sort_by_distance(p)[0] for p in [
        (0, 0, -101.585649),
        (0, -31.75, -101.55091),
    ]]
    fillet(f10_edges, radius=F10_R)

    # F11
    f11_edges = [f1.edges().sort_by_distance(p)[0] for p in [
        (0, -3.175, -97.458176),
        (0, -9.525, -97.458176),
        (0, -15.901723, -97.458176),
        (0, -22.251723, -97.458176),
        (0, -28.601723, -97.458176),
        (0, -25.426723, -101.585649),
        (0, -19.076723, -101.585649),
        (0, -12.7, -101.585649),
        (0, -6.35, -101.585649),
    ]]
    fillet(f11_edges, radius=F11_R)


solid = f1.part
